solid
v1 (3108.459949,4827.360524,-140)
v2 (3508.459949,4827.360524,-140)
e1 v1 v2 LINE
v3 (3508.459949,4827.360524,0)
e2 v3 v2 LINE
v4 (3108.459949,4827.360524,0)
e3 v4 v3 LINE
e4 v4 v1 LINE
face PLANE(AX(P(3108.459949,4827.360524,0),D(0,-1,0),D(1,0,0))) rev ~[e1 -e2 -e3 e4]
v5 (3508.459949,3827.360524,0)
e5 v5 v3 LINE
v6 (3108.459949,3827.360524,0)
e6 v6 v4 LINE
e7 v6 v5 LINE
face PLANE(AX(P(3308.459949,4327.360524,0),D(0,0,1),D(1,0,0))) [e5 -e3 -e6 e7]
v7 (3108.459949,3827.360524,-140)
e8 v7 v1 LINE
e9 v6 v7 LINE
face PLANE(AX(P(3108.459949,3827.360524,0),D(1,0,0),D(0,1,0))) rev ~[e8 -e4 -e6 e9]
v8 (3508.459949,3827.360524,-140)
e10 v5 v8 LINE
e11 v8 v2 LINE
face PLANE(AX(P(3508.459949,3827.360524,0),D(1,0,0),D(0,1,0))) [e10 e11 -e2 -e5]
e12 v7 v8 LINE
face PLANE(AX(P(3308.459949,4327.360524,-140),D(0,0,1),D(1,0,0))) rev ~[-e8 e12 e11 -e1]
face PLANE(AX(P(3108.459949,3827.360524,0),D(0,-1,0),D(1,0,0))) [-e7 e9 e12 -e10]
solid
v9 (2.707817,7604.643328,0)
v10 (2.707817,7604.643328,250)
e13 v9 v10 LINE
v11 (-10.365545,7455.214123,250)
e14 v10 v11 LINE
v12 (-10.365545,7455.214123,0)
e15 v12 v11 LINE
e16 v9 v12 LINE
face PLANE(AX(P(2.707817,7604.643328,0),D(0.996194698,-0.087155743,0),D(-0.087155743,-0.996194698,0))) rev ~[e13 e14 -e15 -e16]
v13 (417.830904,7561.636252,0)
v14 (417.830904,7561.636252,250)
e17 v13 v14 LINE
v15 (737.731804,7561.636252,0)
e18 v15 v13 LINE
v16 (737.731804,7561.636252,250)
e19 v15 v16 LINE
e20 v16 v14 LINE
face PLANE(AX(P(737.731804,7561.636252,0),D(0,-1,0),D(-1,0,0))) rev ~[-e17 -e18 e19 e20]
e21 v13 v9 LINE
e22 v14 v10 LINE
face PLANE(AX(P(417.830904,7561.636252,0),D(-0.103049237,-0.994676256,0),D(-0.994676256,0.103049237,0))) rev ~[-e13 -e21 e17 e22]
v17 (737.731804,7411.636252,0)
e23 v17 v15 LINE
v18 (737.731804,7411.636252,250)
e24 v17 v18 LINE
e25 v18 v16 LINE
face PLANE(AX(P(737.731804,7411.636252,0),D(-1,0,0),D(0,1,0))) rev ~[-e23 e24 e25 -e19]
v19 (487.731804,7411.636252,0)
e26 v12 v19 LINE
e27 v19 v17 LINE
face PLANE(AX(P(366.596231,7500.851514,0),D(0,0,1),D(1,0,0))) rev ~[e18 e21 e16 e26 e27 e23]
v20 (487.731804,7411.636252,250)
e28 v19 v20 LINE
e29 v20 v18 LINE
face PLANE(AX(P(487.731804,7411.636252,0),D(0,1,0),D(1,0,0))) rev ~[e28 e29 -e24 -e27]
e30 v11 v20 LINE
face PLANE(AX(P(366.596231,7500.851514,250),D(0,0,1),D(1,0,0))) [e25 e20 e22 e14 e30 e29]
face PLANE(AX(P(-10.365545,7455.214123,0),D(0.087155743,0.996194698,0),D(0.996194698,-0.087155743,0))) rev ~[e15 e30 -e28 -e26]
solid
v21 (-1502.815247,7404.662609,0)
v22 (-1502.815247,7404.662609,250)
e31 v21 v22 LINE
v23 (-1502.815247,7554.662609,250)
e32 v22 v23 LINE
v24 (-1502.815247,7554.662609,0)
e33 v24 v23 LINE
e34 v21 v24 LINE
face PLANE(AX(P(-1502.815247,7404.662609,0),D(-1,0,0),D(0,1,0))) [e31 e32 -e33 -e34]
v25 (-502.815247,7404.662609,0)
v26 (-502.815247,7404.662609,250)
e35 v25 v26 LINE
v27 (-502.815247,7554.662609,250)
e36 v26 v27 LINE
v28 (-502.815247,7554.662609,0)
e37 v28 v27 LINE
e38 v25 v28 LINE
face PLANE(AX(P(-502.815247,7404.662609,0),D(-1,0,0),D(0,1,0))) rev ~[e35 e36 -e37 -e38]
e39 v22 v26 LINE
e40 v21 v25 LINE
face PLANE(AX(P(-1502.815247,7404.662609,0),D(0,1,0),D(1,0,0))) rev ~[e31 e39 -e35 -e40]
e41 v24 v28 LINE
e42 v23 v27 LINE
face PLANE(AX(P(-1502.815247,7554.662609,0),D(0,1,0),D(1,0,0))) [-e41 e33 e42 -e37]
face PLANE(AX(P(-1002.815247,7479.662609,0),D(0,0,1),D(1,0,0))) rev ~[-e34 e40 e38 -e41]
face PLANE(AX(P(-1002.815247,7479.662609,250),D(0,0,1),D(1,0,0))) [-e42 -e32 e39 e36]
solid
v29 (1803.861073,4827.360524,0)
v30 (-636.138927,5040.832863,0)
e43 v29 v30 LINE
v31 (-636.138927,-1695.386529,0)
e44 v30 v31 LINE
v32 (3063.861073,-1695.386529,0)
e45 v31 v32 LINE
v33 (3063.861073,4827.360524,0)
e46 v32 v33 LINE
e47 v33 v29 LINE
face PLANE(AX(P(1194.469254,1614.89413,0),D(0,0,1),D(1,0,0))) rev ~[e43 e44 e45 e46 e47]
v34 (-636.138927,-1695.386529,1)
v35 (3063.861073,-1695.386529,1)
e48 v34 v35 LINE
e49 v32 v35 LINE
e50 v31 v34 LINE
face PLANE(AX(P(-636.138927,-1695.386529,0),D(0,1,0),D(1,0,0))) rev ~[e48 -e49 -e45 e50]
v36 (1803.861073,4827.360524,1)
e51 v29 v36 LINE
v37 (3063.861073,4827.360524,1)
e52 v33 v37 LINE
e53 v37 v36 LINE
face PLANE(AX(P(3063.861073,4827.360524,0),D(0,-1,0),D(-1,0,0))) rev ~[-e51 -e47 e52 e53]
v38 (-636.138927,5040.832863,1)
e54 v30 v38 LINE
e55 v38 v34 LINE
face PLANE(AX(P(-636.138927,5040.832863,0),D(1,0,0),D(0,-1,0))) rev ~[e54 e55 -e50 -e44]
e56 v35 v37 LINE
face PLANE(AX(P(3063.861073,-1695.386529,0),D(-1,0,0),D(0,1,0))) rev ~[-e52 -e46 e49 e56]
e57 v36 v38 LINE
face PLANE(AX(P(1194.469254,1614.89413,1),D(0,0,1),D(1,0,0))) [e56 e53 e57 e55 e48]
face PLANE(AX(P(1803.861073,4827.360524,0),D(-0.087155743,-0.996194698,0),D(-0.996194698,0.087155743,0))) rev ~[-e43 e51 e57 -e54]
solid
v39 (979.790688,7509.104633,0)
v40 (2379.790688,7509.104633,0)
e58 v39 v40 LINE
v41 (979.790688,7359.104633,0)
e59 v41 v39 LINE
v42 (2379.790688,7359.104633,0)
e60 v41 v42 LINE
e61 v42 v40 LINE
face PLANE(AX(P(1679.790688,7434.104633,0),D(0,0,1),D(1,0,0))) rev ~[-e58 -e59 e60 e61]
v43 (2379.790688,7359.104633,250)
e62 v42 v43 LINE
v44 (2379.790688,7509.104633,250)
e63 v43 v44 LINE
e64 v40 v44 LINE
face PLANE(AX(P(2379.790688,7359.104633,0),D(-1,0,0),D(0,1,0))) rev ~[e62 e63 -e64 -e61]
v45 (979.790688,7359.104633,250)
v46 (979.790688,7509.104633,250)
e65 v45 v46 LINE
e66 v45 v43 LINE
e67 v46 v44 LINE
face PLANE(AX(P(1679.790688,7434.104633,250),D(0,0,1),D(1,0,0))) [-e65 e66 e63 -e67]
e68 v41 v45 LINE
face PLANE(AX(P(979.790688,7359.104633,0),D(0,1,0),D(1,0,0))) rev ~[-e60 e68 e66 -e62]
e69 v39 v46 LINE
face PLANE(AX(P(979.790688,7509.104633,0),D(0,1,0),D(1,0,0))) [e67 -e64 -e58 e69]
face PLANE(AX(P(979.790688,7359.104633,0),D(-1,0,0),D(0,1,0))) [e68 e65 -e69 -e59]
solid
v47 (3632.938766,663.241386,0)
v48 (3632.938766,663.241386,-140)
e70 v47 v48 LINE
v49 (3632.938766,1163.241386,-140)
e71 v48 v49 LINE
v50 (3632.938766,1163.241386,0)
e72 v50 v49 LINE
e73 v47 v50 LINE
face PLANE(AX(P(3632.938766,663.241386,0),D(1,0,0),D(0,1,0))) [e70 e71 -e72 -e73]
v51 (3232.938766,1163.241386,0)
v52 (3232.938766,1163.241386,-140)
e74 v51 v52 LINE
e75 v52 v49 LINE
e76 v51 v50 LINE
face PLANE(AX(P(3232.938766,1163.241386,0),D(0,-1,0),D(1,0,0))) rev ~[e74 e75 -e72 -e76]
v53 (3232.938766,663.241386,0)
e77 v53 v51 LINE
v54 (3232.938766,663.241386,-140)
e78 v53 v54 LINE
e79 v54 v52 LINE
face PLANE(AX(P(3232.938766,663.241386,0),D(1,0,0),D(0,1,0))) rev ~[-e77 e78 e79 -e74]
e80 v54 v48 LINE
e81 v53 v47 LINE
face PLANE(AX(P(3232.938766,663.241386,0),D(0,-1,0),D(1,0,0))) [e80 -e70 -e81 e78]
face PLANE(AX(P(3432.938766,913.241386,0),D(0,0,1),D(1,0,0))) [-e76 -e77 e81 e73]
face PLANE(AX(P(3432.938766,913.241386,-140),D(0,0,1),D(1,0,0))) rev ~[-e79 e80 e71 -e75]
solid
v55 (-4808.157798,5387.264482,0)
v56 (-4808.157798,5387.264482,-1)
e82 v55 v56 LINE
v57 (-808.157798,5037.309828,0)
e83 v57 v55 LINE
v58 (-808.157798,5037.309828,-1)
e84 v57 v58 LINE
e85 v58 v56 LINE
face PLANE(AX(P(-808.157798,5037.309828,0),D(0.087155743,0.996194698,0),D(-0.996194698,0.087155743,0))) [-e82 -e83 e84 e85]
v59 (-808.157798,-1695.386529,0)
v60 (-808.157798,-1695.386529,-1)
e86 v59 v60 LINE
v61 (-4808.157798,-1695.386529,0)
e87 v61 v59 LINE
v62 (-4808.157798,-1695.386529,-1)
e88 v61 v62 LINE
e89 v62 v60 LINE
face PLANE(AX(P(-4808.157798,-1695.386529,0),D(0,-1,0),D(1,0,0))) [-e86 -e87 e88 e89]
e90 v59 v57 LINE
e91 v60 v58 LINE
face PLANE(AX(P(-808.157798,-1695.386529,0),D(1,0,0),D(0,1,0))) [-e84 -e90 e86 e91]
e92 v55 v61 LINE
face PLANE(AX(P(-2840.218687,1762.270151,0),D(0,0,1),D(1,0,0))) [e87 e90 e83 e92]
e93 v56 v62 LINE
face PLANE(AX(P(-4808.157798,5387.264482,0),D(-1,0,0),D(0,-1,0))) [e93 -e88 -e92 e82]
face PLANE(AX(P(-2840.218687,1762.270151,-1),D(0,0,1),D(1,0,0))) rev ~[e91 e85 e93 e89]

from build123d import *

# Parameters (mm, degrees)
F0_W     = 400
F0_H     = 1000
F1_DEPTH = 140
F0_H_2   = 500
F2_DEPTH = 1
F4_DEPTH = 1
F0_W_2   = 1000
F0_H_3   = 150
F6_DEPTH = 250
F0_W_3   = 1400


# Not quite as in the source:
# - the program builds the solid bodies; features that only make, move or delete a surface that nothing else refers to are left out


with BuildPart() as f1:
    # F0 (on Top) → F1 (new body)
    with BuildSketch(Plane.XY):
        with Locations((3308.4599494934, 4327.3605238324)):
            Rectangle(F0_W, F0_H)
    extrude(amount=-F1_DEPTH)


with BuildPart() as f1b:
    # F0 (on Top) → F1, piece 2 (new body)
    with BuildSketch(Plane.XY):
        with Locations((3432.9387664795, 913.2413864136)):
            Rectangle(F0_W, F0_H_2)
    extrude(amount=-F1_DEPTH)


with BuildPart() as f2:
    # F0 (on Top) → F2 (new body)
    with BuildSketch(Plane.XY):
        Polygon((-4808.1577976546, -1695.3865286843), (-808.1577976546, -1695.3865286843), (-808.1577976546, 5037.3098283165), (-4808.1577976546, 5387.2644824202), align=None)
    extrude(amount=-F2_DEPTH)


with BuildPart() as f4:
    # F0 (on Top) → F4 (new body)
    with BuildSketch(Plane.XY):
        Polygon((-636.1389268665, 5040.8328628357), (-636.1389268665, -1695.3865286843), (3063.8610731335, -1695.3865286843), (3063.8610731335, 4827.3605238324), (1803.8610731335, 4827.3605238324), align=None)
    extrude(amount=F4_DEPTH)


with BuildPart() as f6:
    # F0 (on Top) → F6 (new body)
    with BuildSketch(Plane.XY):
        with Locations((-1002.815246582, 7479.6626091003)):
            Rectangle(F0_W_2, F0_H_3)
    extrude(amount=F6_DEPTH)


with BuildPart() as f6b:
    # F0 (on Top) → F6, piece 2 (new body)
    with BuildSketch(Plane.XY):
        Polygon((487.73180431, 7411.6362518106), (737.73180431, 7411.6362518106), (737.73180431, 7561.6362518106), (417.8309041372, 7561.6362518106), (2.7078166763, 7604.6433278982), (-10.3655447358, 7455.2141231845), align=None)
    extrude(amount=F6_DEPTH)


with BuildPart() as f6c:
    # F0 (on Top) → F6, piece 3 (new body)
    with BuildSketch(Plane.XY):
        with Locations((1679.790687561, 7434.1046333313)):
            Rectangle(F0_W_3, F0_H_3)
    extrude(amount=F6_DEPTH)


solid = Compound([f1.part, f1b.part, f2.part, f4.part, f6.part, f6b.part, f6c.part])
